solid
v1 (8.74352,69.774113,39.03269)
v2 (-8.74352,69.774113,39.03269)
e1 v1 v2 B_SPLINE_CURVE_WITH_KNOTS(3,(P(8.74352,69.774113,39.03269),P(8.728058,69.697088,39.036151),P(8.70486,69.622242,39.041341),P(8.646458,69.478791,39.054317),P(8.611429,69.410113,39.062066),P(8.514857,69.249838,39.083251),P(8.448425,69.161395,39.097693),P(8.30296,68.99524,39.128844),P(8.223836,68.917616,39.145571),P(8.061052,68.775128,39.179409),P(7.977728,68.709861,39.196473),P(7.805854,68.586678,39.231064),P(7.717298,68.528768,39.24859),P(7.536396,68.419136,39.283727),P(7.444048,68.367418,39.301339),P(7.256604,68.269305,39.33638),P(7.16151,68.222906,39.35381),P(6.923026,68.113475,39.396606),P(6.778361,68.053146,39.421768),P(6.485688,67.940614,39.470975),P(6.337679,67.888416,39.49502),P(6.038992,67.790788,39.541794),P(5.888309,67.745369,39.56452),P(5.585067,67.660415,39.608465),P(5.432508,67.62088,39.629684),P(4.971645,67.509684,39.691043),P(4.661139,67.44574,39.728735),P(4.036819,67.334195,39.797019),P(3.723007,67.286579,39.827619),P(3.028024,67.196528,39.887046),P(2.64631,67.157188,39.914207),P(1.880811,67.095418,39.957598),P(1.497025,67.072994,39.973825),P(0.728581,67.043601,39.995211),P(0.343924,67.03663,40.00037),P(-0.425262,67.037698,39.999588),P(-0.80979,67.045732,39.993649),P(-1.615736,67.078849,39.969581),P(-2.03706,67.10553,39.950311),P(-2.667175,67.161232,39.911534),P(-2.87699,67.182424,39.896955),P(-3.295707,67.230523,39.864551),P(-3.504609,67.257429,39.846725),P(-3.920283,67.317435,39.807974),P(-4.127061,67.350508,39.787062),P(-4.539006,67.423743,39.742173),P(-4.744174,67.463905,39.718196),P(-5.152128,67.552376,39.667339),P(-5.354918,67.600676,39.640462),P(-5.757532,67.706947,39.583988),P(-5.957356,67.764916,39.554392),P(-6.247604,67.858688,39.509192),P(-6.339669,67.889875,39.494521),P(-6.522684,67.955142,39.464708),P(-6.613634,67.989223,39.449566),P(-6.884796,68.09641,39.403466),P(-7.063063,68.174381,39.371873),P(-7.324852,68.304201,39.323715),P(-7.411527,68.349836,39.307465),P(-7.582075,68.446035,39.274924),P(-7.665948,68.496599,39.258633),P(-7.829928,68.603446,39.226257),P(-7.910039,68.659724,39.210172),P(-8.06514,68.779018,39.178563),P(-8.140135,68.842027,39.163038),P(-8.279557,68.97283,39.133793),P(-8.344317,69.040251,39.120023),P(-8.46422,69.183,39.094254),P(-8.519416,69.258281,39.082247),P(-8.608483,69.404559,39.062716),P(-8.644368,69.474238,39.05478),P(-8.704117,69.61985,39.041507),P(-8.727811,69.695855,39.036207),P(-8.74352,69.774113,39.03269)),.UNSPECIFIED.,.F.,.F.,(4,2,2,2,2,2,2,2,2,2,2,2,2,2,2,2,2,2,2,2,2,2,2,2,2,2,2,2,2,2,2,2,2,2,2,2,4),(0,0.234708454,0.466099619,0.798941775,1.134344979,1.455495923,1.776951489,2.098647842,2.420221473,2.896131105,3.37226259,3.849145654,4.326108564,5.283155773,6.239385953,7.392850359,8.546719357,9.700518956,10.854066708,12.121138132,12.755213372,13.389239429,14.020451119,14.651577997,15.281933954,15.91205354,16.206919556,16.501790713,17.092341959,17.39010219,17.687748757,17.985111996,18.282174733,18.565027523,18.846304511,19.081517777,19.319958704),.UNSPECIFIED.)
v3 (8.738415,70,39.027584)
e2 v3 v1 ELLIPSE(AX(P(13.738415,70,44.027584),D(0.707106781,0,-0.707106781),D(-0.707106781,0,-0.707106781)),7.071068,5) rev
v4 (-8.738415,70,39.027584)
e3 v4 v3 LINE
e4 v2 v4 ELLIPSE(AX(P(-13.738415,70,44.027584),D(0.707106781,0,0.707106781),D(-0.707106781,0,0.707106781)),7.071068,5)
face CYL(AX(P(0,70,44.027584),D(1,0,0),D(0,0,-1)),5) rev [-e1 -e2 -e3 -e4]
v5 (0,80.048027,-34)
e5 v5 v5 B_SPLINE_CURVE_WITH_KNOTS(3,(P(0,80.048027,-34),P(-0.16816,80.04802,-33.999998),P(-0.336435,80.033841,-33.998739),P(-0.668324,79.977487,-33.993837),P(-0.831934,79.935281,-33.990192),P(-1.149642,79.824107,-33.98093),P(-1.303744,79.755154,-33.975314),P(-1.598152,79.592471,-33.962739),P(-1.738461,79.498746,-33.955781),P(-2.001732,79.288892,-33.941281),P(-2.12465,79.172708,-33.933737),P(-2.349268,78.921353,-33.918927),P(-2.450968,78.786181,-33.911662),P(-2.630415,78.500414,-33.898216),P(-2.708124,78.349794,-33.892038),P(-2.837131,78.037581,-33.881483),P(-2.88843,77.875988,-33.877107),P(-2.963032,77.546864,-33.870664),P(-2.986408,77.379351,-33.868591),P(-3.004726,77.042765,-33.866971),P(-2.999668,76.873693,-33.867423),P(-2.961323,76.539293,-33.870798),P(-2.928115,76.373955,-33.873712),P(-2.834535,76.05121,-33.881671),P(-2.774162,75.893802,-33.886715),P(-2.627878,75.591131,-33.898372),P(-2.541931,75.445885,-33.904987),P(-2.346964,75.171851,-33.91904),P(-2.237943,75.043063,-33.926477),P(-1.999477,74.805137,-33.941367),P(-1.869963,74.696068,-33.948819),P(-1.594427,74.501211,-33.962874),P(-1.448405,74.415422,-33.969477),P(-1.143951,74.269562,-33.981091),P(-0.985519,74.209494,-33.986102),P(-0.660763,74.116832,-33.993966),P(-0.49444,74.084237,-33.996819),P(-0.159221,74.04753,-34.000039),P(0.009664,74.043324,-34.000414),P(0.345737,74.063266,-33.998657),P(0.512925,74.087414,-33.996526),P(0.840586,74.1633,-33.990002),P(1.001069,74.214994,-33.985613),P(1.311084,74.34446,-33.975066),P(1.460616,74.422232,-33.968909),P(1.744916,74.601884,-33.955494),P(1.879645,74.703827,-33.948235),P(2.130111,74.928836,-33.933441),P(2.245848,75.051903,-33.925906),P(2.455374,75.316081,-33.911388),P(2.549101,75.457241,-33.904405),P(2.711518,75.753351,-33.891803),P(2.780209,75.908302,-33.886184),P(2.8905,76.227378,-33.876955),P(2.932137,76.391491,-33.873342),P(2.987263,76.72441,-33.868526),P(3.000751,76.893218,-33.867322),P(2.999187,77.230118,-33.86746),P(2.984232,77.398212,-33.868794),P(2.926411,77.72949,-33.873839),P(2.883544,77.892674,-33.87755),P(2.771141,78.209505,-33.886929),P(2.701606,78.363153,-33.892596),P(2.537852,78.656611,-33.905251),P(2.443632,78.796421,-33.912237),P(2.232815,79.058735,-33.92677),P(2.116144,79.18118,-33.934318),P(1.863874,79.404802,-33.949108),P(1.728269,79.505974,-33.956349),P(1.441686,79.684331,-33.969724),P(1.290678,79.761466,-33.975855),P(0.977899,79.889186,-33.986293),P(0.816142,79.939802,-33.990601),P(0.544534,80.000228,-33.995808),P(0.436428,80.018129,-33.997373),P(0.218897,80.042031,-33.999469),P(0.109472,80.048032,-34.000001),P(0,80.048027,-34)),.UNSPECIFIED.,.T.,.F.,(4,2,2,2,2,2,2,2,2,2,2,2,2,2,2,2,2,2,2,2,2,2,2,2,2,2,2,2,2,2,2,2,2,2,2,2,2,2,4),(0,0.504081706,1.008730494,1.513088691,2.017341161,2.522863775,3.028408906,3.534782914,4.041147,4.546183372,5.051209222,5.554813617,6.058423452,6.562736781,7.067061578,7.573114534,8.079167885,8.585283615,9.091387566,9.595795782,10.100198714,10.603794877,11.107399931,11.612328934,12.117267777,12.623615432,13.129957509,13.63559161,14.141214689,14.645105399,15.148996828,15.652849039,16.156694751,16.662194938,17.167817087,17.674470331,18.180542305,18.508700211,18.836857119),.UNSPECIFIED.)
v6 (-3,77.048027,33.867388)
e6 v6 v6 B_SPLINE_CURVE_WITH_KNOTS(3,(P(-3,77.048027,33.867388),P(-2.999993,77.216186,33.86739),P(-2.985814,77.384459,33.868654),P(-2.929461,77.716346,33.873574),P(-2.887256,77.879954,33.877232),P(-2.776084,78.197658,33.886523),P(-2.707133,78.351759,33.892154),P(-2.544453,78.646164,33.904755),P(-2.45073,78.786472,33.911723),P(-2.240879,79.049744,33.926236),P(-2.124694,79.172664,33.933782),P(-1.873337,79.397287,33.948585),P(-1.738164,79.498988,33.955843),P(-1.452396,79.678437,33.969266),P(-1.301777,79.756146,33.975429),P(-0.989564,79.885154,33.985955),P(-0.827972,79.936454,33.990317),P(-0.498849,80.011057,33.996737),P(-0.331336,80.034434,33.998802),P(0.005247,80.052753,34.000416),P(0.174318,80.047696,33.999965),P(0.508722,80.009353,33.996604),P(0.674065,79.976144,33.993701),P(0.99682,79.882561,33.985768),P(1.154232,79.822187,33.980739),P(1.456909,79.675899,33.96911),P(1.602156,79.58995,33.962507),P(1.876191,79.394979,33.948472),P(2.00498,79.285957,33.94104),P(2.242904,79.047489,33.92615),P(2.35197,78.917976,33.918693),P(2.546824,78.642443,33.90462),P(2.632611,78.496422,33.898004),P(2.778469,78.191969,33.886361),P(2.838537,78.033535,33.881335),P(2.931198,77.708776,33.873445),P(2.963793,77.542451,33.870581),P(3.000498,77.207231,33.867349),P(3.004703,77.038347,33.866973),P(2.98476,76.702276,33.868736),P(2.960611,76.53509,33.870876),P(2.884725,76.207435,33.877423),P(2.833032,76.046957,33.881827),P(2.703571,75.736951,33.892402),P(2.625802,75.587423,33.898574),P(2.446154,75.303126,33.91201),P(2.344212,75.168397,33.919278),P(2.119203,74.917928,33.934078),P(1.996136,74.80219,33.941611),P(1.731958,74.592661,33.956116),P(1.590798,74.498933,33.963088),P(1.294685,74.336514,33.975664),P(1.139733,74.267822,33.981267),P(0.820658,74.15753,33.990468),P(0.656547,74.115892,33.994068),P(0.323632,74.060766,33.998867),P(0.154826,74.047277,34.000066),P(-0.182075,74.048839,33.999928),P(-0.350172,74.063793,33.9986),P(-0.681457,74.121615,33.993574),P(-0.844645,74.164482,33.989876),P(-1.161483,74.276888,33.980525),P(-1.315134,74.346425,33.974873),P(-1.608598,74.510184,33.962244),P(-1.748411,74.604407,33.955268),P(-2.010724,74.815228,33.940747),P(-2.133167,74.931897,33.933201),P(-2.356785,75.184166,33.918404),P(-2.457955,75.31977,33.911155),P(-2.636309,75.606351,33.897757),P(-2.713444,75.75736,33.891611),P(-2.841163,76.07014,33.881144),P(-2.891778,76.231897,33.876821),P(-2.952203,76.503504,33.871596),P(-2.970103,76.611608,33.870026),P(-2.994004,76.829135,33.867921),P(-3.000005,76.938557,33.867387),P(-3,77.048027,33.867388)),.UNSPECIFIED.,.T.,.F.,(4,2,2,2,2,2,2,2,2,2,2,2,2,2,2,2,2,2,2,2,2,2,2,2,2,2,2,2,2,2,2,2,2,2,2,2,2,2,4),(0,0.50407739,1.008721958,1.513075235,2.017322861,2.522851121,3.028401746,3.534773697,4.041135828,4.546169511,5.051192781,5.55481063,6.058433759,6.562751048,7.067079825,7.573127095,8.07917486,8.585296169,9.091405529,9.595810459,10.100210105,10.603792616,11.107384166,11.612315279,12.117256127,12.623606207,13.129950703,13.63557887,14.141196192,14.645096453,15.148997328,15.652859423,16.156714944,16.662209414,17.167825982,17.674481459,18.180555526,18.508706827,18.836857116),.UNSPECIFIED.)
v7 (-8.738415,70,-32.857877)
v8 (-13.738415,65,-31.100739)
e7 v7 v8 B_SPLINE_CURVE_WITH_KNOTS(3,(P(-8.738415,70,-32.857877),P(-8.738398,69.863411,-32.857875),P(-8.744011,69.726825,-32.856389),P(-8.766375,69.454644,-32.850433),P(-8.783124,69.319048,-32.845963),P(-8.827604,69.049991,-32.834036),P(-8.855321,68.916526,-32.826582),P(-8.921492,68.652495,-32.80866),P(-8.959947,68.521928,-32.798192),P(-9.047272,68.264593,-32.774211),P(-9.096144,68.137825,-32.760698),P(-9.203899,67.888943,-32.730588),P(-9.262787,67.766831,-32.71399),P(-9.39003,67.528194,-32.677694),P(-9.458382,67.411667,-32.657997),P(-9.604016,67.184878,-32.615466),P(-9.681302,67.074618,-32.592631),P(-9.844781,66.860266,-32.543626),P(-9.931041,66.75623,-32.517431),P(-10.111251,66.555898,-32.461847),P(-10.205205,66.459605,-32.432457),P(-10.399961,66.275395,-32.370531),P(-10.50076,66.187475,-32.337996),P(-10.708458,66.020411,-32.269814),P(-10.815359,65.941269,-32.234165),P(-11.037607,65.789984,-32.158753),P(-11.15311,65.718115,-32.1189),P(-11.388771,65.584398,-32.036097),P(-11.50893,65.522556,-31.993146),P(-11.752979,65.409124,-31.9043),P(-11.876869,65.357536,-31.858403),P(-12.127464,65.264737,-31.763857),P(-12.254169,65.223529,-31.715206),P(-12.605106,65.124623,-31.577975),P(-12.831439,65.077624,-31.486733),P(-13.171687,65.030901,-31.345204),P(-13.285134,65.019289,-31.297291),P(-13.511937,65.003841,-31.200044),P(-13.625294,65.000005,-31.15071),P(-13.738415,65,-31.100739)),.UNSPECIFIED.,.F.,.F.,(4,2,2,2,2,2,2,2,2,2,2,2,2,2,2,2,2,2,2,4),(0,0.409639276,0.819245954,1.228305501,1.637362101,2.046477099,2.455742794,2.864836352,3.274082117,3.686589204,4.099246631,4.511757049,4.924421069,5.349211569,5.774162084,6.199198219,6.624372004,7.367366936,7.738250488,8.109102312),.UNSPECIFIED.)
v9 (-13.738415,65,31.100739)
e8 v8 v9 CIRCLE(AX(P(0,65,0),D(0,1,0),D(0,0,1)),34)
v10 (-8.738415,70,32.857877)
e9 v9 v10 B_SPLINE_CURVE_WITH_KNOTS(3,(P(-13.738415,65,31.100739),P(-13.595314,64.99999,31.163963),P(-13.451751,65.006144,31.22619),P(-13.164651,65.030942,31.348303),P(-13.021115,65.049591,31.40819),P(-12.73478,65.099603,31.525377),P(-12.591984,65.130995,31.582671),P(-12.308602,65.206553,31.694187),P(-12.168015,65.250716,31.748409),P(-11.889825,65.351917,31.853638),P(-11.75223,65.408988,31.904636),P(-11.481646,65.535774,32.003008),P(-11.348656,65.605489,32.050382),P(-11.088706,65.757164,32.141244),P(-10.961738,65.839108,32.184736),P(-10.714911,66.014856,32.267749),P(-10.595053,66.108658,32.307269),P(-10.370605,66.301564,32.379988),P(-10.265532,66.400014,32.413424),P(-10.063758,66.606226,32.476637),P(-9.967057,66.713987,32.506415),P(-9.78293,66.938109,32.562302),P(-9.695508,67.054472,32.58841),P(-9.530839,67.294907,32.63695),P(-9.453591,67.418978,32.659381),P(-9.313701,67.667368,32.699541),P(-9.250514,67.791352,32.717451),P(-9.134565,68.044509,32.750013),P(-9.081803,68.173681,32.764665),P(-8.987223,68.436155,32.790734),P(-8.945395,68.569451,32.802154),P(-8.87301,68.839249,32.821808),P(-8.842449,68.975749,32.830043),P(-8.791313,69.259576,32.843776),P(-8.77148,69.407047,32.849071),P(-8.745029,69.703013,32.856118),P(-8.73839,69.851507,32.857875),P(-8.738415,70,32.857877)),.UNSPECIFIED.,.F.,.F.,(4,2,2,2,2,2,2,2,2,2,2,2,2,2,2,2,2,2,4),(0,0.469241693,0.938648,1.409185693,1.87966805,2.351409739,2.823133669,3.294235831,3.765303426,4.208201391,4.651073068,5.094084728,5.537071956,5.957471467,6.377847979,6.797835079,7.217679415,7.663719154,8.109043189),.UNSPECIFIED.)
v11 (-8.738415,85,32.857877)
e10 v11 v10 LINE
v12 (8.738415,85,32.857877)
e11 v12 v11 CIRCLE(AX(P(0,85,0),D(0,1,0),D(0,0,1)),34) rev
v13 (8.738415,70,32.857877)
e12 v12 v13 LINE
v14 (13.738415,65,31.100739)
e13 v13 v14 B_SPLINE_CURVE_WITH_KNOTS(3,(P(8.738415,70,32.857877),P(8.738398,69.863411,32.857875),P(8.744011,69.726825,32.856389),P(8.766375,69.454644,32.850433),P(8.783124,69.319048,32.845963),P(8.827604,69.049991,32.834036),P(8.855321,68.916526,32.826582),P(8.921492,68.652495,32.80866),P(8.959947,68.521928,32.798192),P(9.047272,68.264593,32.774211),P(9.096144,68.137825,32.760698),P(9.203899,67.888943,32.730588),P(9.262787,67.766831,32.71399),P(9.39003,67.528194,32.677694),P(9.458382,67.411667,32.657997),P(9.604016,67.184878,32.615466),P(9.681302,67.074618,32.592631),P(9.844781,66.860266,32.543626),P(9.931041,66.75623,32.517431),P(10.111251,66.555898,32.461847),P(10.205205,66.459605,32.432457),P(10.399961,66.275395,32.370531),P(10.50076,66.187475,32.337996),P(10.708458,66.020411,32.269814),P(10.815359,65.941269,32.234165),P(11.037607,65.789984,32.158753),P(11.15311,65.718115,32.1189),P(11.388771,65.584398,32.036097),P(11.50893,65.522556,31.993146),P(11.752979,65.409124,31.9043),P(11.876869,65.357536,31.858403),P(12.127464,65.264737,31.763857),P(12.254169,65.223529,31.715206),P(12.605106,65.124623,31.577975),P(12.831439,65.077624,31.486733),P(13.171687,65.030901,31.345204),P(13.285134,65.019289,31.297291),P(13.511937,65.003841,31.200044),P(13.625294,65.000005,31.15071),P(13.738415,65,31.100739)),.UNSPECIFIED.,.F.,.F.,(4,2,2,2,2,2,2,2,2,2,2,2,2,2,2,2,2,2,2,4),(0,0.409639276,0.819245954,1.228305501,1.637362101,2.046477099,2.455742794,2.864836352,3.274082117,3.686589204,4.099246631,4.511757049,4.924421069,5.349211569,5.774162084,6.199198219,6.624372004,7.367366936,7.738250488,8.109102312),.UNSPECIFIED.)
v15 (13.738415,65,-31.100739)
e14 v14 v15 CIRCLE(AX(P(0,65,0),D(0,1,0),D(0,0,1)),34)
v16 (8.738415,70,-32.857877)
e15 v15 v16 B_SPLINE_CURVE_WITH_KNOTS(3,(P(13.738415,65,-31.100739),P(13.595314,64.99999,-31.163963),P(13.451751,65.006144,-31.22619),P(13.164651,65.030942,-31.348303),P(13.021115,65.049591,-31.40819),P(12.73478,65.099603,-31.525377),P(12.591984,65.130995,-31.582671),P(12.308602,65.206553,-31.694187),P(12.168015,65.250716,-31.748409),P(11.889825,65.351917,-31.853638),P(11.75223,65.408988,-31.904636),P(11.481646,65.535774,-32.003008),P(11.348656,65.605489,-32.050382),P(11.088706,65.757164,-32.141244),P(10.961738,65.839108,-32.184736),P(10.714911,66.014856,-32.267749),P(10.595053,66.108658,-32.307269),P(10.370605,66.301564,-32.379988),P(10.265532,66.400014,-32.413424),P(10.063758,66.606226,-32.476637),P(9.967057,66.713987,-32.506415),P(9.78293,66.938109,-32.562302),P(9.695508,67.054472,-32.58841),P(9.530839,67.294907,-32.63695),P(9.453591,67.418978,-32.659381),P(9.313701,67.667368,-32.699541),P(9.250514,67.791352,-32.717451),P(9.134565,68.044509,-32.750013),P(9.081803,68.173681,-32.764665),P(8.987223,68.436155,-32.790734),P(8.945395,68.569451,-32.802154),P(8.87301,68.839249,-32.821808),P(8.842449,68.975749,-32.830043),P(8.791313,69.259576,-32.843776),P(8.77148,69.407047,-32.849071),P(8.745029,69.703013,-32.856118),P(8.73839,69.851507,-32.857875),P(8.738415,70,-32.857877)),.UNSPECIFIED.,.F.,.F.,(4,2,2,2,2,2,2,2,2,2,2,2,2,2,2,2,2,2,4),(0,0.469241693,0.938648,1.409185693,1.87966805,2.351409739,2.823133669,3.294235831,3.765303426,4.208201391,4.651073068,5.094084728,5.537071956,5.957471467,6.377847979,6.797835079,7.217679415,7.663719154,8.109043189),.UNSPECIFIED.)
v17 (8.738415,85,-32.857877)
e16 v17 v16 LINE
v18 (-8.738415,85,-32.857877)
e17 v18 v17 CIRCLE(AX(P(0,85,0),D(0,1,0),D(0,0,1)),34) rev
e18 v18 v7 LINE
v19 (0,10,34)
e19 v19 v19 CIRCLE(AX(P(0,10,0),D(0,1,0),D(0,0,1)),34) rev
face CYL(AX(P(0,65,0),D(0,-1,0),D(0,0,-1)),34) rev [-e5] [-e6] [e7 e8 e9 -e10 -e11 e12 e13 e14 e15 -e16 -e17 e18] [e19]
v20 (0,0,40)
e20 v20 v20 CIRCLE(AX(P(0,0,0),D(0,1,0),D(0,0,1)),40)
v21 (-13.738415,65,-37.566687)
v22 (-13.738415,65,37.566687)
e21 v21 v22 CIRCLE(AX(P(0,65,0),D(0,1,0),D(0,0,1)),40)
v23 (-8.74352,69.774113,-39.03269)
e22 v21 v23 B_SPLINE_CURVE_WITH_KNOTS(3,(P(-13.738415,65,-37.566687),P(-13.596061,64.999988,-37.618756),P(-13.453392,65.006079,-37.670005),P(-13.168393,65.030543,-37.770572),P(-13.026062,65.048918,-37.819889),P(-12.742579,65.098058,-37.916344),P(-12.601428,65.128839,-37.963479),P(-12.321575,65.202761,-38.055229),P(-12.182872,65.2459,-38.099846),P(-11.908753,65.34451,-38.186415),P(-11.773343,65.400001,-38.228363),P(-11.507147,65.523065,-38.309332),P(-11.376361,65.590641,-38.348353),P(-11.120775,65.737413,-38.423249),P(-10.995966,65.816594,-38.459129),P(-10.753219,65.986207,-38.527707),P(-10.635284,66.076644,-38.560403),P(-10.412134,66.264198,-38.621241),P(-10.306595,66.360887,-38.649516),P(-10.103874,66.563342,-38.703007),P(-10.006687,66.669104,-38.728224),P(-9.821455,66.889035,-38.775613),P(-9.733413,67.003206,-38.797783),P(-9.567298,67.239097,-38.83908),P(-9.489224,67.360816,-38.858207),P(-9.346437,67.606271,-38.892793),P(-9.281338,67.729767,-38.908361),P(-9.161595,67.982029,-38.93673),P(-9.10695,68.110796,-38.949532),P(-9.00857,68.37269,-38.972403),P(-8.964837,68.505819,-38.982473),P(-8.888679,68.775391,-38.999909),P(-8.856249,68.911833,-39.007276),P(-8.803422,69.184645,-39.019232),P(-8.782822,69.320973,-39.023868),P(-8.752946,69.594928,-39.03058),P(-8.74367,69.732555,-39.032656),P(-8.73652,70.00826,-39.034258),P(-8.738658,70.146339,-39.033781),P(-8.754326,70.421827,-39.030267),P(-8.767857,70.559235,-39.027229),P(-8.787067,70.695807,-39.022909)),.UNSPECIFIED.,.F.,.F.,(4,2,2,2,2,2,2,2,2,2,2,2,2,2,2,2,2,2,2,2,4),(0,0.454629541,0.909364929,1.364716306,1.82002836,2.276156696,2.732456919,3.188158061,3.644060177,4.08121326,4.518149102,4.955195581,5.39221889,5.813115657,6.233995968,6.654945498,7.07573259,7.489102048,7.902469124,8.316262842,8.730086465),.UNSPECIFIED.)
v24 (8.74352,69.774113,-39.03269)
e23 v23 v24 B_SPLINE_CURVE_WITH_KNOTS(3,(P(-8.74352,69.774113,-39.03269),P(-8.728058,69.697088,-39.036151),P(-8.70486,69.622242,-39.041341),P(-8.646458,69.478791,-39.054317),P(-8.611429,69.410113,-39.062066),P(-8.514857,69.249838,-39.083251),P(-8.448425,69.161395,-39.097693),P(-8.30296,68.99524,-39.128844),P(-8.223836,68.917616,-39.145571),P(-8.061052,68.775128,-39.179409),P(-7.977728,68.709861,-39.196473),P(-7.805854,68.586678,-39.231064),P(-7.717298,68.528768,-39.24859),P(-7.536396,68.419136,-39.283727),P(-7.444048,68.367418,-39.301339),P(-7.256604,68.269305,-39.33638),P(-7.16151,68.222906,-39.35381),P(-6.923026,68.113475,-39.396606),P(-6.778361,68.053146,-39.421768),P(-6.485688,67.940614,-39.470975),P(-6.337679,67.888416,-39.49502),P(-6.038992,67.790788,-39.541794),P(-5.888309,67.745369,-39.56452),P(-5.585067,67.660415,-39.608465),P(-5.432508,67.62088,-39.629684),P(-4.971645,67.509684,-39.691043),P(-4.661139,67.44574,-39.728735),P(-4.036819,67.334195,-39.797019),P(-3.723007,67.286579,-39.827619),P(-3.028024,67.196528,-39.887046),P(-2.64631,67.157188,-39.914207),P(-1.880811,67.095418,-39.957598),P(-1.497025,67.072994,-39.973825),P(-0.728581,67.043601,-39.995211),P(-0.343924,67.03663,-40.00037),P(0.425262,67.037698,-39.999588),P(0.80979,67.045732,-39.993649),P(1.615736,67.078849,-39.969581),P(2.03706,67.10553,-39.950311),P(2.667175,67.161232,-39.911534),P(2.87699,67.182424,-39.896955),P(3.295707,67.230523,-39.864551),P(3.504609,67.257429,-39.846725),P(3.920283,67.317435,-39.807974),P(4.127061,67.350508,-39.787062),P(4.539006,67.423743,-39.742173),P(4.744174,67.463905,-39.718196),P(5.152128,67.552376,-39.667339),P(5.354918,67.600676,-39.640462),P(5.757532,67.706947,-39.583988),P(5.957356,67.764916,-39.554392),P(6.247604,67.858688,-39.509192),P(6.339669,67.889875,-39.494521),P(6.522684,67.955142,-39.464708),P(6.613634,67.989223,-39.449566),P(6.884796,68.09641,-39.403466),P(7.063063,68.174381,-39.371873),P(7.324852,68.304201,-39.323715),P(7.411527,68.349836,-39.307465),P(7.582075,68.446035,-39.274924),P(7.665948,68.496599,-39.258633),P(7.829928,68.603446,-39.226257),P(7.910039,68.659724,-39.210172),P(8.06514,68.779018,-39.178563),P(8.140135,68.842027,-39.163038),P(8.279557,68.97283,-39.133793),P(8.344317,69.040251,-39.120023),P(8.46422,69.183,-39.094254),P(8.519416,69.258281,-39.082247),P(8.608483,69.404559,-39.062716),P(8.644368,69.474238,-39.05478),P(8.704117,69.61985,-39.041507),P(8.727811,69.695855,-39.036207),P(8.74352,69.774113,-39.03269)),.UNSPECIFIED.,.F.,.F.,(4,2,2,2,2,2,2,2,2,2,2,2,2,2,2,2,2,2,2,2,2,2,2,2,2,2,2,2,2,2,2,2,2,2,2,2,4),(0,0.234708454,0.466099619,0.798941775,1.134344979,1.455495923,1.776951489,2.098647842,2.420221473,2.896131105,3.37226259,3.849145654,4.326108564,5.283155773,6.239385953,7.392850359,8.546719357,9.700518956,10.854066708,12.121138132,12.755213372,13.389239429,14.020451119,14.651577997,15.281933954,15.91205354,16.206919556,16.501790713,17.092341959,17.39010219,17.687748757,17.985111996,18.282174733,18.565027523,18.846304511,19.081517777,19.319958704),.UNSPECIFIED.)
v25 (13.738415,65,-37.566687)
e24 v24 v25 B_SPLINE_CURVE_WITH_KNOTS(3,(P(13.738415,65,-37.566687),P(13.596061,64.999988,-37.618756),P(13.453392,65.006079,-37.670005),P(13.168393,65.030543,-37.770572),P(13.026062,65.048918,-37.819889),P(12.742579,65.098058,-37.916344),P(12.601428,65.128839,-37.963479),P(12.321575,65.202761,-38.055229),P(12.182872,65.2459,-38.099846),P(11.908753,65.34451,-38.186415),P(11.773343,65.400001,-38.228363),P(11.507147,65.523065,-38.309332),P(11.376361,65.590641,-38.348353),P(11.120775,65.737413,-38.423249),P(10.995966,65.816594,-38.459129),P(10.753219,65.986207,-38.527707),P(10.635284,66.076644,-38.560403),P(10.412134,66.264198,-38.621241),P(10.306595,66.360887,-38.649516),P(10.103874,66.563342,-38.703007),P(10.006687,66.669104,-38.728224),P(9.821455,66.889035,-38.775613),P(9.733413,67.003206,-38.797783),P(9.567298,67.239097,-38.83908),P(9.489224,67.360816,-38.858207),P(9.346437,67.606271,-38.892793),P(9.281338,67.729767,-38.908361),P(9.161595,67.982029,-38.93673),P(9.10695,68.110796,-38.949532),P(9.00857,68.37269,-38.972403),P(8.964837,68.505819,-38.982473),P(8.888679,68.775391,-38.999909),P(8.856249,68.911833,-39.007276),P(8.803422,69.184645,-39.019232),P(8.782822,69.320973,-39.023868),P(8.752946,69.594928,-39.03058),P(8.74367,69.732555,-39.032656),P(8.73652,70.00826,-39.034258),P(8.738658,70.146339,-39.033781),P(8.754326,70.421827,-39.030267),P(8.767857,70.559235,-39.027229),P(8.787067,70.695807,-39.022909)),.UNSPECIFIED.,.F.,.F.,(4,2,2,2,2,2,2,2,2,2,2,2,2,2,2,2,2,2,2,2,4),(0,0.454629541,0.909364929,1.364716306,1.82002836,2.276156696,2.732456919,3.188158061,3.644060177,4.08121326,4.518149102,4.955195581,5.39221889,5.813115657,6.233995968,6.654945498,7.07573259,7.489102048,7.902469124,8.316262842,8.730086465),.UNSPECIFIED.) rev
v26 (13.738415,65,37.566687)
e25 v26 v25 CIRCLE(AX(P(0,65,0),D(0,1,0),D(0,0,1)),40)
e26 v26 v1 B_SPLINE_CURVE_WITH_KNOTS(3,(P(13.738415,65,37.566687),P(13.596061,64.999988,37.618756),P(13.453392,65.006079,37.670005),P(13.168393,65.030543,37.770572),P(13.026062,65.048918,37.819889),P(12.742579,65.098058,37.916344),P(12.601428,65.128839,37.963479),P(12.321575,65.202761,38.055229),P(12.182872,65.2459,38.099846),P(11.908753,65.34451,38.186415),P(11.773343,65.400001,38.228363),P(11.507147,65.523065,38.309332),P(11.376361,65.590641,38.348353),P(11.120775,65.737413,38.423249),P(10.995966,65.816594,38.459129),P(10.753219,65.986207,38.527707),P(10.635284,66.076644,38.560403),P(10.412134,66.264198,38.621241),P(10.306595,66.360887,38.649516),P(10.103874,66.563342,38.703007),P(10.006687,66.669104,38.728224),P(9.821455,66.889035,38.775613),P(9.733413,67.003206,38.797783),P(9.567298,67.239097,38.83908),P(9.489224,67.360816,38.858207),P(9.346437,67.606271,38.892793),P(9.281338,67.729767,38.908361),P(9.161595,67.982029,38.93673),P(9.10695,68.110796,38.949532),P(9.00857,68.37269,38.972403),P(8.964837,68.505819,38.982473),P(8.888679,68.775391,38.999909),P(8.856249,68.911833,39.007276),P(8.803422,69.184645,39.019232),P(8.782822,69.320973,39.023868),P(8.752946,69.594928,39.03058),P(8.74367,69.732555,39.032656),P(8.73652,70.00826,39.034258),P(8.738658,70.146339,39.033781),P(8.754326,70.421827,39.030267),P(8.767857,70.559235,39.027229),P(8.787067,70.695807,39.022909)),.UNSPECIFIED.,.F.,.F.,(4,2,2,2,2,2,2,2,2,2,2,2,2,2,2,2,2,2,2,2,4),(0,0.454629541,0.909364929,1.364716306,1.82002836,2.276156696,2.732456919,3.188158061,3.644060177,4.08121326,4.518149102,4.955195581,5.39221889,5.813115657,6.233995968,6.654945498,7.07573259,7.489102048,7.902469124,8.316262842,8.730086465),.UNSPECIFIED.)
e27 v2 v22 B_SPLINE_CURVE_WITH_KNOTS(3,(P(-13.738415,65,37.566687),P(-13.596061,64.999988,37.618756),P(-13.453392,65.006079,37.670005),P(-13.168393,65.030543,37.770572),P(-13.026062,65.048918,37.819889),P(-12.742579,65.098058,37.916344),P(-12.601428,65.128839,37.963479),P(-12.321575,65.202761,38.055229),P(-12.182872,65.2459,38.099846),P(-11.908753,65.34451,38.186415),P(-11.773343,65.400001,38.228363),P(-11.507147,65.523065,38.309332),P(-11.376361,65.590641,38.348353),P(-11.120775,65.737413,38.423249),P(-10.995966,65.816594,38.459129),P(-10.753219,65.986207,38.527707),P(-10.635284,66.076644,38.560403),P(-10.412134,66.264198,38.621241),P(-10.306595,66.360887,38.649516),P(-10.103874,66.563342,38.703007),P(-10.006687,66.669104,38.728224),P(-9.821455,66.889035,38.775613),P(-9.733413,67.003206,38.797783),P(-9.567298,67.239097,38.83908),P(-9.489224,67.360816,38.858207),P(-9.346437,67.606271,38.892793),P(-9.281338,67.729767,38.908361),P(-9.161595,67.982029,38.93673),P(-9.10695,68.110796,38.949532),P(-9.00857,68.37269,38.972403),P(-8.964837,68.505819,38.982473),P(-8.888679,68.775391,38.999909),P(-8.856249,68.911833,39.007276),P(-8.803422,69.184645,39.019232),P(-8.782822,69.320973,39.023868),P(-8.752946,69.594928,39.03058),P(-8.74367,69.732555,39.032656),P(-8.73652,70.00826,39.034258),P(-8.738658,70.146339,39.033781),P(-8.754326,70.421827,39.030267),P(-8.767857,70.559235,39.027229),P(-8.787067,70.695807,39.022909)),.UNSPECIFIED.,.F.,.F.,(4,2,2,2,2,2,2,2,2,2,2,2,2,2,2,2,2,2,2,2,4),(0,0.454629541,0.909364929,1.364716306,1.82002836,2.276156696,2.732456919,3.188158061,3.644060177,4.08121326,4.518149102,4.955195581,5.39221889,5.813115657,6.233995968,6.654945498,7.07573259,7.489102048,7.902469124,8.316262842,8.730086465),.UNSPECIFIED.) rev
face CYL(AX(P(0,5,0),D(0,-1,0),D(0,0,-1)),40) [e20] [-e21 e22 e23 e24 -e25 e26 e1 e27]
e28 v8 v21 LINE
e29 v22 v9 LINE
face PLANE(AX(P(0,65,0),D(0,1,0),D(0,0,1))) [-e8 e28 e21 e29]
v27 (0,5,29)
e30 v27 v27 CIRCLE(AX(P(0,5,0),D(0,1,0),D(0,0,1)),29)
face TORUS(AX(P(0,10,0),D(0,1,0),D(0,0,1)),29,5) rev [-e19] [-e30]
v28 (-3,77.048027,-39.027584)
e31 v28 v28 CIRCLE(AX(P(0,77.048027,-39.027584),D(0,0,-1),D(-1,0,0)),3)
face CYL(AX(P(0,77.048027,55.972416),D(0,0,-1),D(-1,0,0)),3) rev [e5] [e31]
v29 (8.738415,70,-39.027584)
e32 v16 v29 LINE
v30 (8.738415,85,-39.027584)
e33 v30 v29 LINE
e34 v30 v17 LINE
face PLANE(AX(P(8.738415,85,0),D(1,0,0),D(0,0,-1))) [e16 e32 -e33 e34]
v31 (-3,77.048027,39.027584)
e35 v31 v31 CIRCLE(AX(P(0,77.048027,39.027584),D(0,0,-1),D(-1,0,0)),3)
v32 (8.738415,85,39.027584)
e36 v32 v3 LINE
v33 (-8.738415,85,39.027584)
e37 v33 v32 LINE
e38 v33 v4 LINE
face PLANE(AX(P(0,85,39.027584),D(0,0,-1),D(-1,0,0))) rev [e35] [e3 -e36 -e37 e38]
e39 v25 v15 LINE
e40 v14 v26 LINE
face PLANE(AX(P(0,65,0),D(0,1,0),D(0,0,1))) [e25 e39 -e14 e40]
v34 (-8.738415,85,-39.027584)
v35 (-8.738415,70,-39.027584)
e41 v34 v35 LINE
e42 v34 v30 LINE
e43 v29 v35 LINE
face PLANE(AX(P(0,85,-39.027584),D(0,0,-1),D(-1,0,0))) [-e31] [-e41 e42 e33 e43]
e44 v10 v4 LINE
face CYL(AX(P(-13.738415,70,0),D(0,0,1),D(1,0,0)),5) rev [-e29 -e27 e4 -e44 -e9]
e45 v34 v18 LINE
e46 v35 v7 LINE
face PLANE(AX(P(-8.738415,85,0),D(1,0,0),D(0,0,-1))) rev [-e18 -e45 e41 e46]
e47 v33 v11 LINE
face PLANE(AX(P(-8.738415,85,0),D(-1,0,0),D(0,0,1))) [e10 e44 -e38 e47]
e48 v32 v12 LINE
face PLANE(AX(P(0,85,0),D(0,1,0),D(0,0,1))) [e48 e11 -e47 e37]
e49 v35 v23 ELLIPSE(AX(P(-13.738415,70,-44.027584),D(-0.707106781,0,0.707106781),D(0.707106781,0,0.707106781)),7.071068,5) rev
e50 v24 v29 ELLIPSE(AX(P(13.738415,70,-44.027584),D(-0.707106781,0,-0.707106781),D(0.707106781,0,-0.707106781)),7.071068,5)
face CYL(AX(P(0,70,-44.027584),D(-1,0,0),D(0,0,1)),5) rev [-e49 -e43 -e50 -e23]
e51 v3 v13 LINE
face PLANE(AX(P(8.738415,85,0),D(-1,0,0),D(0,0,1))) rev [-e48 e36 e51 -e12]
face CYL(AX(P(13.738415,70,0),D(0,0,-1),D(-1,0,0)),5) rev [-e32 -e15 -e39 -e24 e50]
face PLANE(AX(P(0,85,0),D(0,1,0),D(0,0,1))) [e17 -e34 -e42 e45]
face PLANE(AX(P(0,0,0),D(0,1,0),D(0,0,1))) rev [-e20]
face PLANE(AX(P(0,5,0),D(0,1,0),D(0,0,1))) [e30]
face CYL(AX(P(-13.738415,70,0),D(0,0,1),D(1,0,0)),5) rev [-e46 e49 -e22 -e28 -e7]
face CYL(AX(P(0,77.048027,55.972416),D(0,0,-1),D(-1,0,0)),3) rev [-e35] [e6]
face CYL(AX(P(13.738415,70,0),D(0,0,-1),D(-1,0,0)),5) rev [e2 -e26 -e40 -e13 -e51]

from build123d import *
from build123d.topology import SkipClean

# Parameters (mm, degrees)
SKETCH1_R           = 40
BOSS_EXTRUDE1_DEPTH = 5
SKETCH2_R           = 40
SKETCH2_R_2         = 34
BOSS_EXTRUDE2_DEPTH = 60
BOSS_EXTRUDE3_DEPTH = 20
FILLET1_R           = 5
SKETCH4_R           = 3
CUT_EXTRUDE1_DEPTH  = 95
FILLET2_R           = 5
FILLET3_R           = 5


with BuildPart() as part:
    # Sketch1 → Boss-Extrude1 (new body)
    with BuildSketch(Plane(origin=(0, 0, 0), x_dir=(1, 0, 0), z_dir=(0, 1, 0))):
        with Locations(Location((0, 0, 0), (0, 0, 270))):
            Circle(SKETCH1_R)
    extrude(amount=BOSS_EXTRUDE1_DEPTH)

    # Sketch2 → Boss-Extrude2 (add)
    with BuildSketch(Plane(origin=(0, 5, 0), x_dir=(1, 0, 0), z_dir=(0, 1, 0))):
        with Locations(Location((0, 0, 0), (0, 0, 270))):
            Circle(SKETCH2_R)
        with Locations(Location((0, 0, 0), (0, 0, 270))):
            Circle(SKETCH2_R_2, mode=Mode.SUBTRACT)
    extrude(amount=BOSS_EXTRUDE2_DEPTH)

    # Sketch3 → Boss-Extrude3 (add)
    with SkipClean():  # the faces are left unmerged after this step: merging them gives an invalid solid
        with BuildSketch(Plane(origin=(0, 65, 0), x_dir=(1, 0, 0), z_dir=(0, 1, 0))):
            with BuildLine():
                ThreePointArc((8.738415, -32.857877), (0, -34), (-8.738415, -32.857877))
                Line((-8.738415, -32.857877), (-8.738415, -39.027584))
                Line((-8.738415, -39.027584), (8.738415, -39.027584))
                Line((8.738415, -39.027584), (8.738415, -32.857877))
            make_face()
            with BuildLine():
                Line((8.738415, 39.027584), (-8.738415, 39.027584))
                Line((-8.738415, 39.027584), (-8.738415, 32.857877))
                ThreePointArc((-8.738415, 32.857877), (0, 34), (8.738415, 32.857877))
                Line((8.738415, 32.857877), (8.738415, 39.027584))
            make_face()
        extrude(amount=BOSS_EXTRUDE3_DEPTH)

    # Fillet1
    # the kernel refuses this fillet: 5 mm, written as the material it adds along each edge
    with BuildSketch(Plane(origin=(8.738415, 65, 39.027584), x_dir=(1, 0, 0), z_dir=(0, 0, -1))) as fillet1_piece_1_section:
        with BuildLine():
            CenterArc((FILLET1_R, -FILLET1_R), FILLET1_R, 90, 90)
            Line((0, -FILLET1_R), (0, 0))
            Line((0, 0), (FILLET1_R, 0))
        make_face()
    fillet1_piece_1 = extrude(amount=18.669707, mode=Mode.PRIVATE)
    fillet1_piece_1 = fillet1_piece_1 & Plane(origin=(0, 66.126044, 0), x_dir=(0, 0, 1), z_dir=(0, -1, 0)) * Cylinder(40, 58, mode=Mode.PRIVATE)
    fillet1_piece_1 = fillet1_piece_1 - Plane(origin=(0, 66.126044, 0), x_dir=(0, 0, 1), z_dir=(0, -1, 0)) * Cylinder(34, 58, mode=Mode.PRIVATE)
    add(fillet1_piece_1)
    with BuildSketch(Plane(origin=(-8.738415, 65, 20.357877), x_dir=(-1, 0, 0), z_dir=(0, 0, 1))) as fillet1_piece_2_section:
        with BuildLine():
            CenterArc((FILLET1_R, -FILLET1_R), FILLET1_R, 90, 90)
            Line((0, -FILLET1_R), (0, 0))
            Line((0, 0), (FILLET1_R, 0))
        make_face()
    fillet1_piece_2 = extrude(amount=18.669707, mode=Mode.PRIVATE)
    fillet1_piece_2 = fillet1_piece_2 & Plane(origin=(0, 66.126045, 0), x_dir=(0, 0, 1), z_dir=(0, -1, 0)) * Cylinder(40, 58, mode=Mode.PRIVATE)
    fillet1_piece_2 = fillet1_piece_2 - Plane(origin=(0, 66.126045, 0), x_dir=(0, 0, 1), z_dir=(0, -1, 0)) * Cylinder(34, 58, mode=Mode.PRIVATE)
    add(fillet1_piece_2)
    with BuildSketch(Plane(origin=(-8.738415, 65, -39.027584), x_dir=(-1, 0, 0), z_dir=(0, 0, 1))) as fillet1_piece_3_section:
        with BuildLine():
            CenterArc((FILLET1_R, -FILLET1_R), FILLET1_R, 90, 90)
            Line((0, -FILLET1_R), (0, 0))
            Line((0, 0), (FILLET1_R, 0))
        make_face()
    fillet1_piece_3 = extrude(amount=18.669707, mode=Mode.PRIVATE)
    fillet1_piece_3 = fillet1_piece_3 & Plane(origin=(0, 66.126044, 0), x_dir=(0, 0, 1), z_dir=(0, -1, 0)) * Cylinder(40, 58, mode=Mode.PRIVATE)
    fillet1_piece_3 = fillet1_piece_3 - Plane(origin=(0, 66.126044, 0), x_dir=(0, 0, 1), z_dir=(0, -1, 0)) * Cylinder(34, 58, mode=Mode.PRIVATE)
    add(fillet1_piece_3)
    with BuildSketch(Plane(origin=(8.738415, 65, -20.357877), x_dir=(1, 0, 0), z_dir=(0, 0, -1))) as fillet1_piece_4_section:
        with BuildLine():
            CenterArc((FILLET1_R, -FILLET1_R), FILLET1_R, 90, 90)
            Line((0, -FILLET1_R), (0, 0))
            Line((0, 0), (FILLET1_R, 0))
        make_face()
    fillet1_piece_4 = extrude(amount=18.669707, mode=Mode.PRIVATE)
    fillet1_piece_4 = fillet1_piece_4 & Plane(origin=(0, 66.126045, 0), x_dir=(0, 0, 1), z_dir=(0, -1, 0)) * Cylinder(40, 58, mode=Mode.PRIVATE)
    fillet1_piece_4 = fillet1_piece_4 - Plane(origin=(0, 66.126045, 0), x_dir=(0, 0, 1), z_dir=(0, -1, 0)) * Cylinder(34, 58, mode=Mode.PRIVATE)
    add(fillet1_piece_4)

    # Sketch4 → Cut-Extrude1 (cut)
    with BuildSketch(Plane(origin=(0, 0, -39.027584), x_dir=(-1, 0, 0), z_dir=(0, 0, -1))):
        with Locations((0, 77.048027)):
            Circle(SKETCH4_R)
    extrude(amount=-CUT_EXTRUDE1_DEPTH, mode=Mode.SUBTRACT)

    # Fillet2
    fillet2_edges = [part.edges().sort_by_distance(p)[0] for p in [
        (0, 5, -34),
    ]]
    fillet(fillet2_edges, radius=FILLET2_R)

    # Fillet3
    # the kernel refuses this fillet: 5 mm, written as the material it adds along each edge
    with BuildSketch(Plane(origin=(-8.738415, 65, 39.027584), x_dir=(0, 1, 0), z_dir=(1, 0, 0))) as fillet3_piece_1_section:
        with BuildLine():
            CenterArc((FILLET3_R, FILLET3_R), FILLET3_R, 180, 90)
            Line((0, FILLET3_R), (0, 0))
            Line((0, 0), (FILLET3_R, 0))
        make_face()
    fillet3_piece_1 = extrude(amount=30.004694, mode=Mode.PRIVATE)
    fillet3_piece_1 = fillet3_piece_1 & Plane(origin=(0, 66.676029, 0), x_dir=(0, 0, 1), z_dir=(0, -1, 0)) * Cylinder(40, 81, mode=Mode.PRIVATE)
    fillet3_piece_1 = fillet3_piece_1 - Plane(origin=(13.738415, 70, 39.364377), x_dir=(1, 0, 0), z_dir=(0, 0, 1)) * Cylinder(5, 81, mode=Mode.PRIVATE)
    add(fillet3_piece_1)
    with BuildSketch(Plane(origin=(8.738415, 65, -39.027584), x_dir=(0, 1, 0), z_dir=(-1, 0, 0))) as fillet3_piece_2_section:
        with BuildLine():
            CenterArc((FILLET3_R, FILLET3_R), FILLET3_R, 180, 90)
            Line((0, FILLET3_R), (0, 0))
            Line((0, 0), (FILLET3_R, 0))
        make_face()
    fillet3_piece_2 = extrude(amount=30.004694, mode=Mode.PRIVATE)
    fillet3_piece_2 = fillet3_piece_2 - Plane(origin=(-13.738415, 70, -39.364375), x_dir=(-1, 0, 0), z_dir=(0, 0, -1)) * Cylinder(5, 81, mode=Mode.PRIVATE)
    fillet3_piece_2 = fillet3_piece_2 & Plane(origin=(0, 66.676016, 0), x_dir=(0, 0, 1), z_dir=(0, -1, 0)) * Cylinder(40, 81, mode=Mode.PRIVATE)
    add(fillet3_piece_2)
    with BuildSketch(Plane(origin=(8.738415, 65, -39.027584), x_dir=(0, 0, -1), z_dir=(1, 0, 0))) as fillet3_piece_3_section:
        with BuildLine():
            CenterArc((FILLET3_R, FILLET3_R), FILLET3_R, 180, 90)
            Line((0, FILLET3_R), (0, 0))
            Line((0, 0), (FILLET3_R, 0))
        make_face()
    fillet3_piece_3 = extrude(amount=12.527864, mode=Mode.PRIVATE)
    fillet3_piece_3 = fillet3_piece_3 & Plane(origin=(0, 67.353955, 0), x_dir=(0, 0, 1), z_dir=(0, -1, 0)) * Cylinder(40, 46, mode=Mode.PRIVATE)
    fillet3_piece_3 = fillet3_piece_3 - Plane(origin=(13.738415, 70, -39.02968), x_dir=(1, 0, 0), z_dir=(0, 0, 1)) * Cylinder(5, 46, mode=Mode.PRIVATE)
    add(fillet3_piece_3)
    with BuildSketch(Plane(origin=(-8.738415, 65, 39.027584), x_dir=(0, 1, 0), z_dir=(-1, 0, 0))) as fillet3_piece_4_section:
        with BuildLine():
            CenterArc((FILLET3_R, -FILLET3_R), FILLET3_R, 90, 90)
            Line((0, -FILLET3_R), (0, 0))
            Line((0, 0), (FILLET3_R, 0))
        make_face()
    fillet3_piece_4 = extrude(amount=12.527864, mode=Mode.PRIVATE)
    fillet3_piece_4 = fillet3_piece_4 - Plane(origin=(-13.738415, 70, 39.02968), x_dir=(-1, 0, 0), z_dir=(0, 0, -1)) * Cylinder(5, 46, mode=Mode.PRIVATE)
    fillet3_piece_4 = fillet3_piece_4 & Plane(origin=(0, 67.353955, 0), x_dir=(0, 0, 1), z_dir=(0, -1, 0)) * Cylinder(40, 46, mode=Mode.PRIVATE)
    add(fillet3_piece_4)


solid = part.part
